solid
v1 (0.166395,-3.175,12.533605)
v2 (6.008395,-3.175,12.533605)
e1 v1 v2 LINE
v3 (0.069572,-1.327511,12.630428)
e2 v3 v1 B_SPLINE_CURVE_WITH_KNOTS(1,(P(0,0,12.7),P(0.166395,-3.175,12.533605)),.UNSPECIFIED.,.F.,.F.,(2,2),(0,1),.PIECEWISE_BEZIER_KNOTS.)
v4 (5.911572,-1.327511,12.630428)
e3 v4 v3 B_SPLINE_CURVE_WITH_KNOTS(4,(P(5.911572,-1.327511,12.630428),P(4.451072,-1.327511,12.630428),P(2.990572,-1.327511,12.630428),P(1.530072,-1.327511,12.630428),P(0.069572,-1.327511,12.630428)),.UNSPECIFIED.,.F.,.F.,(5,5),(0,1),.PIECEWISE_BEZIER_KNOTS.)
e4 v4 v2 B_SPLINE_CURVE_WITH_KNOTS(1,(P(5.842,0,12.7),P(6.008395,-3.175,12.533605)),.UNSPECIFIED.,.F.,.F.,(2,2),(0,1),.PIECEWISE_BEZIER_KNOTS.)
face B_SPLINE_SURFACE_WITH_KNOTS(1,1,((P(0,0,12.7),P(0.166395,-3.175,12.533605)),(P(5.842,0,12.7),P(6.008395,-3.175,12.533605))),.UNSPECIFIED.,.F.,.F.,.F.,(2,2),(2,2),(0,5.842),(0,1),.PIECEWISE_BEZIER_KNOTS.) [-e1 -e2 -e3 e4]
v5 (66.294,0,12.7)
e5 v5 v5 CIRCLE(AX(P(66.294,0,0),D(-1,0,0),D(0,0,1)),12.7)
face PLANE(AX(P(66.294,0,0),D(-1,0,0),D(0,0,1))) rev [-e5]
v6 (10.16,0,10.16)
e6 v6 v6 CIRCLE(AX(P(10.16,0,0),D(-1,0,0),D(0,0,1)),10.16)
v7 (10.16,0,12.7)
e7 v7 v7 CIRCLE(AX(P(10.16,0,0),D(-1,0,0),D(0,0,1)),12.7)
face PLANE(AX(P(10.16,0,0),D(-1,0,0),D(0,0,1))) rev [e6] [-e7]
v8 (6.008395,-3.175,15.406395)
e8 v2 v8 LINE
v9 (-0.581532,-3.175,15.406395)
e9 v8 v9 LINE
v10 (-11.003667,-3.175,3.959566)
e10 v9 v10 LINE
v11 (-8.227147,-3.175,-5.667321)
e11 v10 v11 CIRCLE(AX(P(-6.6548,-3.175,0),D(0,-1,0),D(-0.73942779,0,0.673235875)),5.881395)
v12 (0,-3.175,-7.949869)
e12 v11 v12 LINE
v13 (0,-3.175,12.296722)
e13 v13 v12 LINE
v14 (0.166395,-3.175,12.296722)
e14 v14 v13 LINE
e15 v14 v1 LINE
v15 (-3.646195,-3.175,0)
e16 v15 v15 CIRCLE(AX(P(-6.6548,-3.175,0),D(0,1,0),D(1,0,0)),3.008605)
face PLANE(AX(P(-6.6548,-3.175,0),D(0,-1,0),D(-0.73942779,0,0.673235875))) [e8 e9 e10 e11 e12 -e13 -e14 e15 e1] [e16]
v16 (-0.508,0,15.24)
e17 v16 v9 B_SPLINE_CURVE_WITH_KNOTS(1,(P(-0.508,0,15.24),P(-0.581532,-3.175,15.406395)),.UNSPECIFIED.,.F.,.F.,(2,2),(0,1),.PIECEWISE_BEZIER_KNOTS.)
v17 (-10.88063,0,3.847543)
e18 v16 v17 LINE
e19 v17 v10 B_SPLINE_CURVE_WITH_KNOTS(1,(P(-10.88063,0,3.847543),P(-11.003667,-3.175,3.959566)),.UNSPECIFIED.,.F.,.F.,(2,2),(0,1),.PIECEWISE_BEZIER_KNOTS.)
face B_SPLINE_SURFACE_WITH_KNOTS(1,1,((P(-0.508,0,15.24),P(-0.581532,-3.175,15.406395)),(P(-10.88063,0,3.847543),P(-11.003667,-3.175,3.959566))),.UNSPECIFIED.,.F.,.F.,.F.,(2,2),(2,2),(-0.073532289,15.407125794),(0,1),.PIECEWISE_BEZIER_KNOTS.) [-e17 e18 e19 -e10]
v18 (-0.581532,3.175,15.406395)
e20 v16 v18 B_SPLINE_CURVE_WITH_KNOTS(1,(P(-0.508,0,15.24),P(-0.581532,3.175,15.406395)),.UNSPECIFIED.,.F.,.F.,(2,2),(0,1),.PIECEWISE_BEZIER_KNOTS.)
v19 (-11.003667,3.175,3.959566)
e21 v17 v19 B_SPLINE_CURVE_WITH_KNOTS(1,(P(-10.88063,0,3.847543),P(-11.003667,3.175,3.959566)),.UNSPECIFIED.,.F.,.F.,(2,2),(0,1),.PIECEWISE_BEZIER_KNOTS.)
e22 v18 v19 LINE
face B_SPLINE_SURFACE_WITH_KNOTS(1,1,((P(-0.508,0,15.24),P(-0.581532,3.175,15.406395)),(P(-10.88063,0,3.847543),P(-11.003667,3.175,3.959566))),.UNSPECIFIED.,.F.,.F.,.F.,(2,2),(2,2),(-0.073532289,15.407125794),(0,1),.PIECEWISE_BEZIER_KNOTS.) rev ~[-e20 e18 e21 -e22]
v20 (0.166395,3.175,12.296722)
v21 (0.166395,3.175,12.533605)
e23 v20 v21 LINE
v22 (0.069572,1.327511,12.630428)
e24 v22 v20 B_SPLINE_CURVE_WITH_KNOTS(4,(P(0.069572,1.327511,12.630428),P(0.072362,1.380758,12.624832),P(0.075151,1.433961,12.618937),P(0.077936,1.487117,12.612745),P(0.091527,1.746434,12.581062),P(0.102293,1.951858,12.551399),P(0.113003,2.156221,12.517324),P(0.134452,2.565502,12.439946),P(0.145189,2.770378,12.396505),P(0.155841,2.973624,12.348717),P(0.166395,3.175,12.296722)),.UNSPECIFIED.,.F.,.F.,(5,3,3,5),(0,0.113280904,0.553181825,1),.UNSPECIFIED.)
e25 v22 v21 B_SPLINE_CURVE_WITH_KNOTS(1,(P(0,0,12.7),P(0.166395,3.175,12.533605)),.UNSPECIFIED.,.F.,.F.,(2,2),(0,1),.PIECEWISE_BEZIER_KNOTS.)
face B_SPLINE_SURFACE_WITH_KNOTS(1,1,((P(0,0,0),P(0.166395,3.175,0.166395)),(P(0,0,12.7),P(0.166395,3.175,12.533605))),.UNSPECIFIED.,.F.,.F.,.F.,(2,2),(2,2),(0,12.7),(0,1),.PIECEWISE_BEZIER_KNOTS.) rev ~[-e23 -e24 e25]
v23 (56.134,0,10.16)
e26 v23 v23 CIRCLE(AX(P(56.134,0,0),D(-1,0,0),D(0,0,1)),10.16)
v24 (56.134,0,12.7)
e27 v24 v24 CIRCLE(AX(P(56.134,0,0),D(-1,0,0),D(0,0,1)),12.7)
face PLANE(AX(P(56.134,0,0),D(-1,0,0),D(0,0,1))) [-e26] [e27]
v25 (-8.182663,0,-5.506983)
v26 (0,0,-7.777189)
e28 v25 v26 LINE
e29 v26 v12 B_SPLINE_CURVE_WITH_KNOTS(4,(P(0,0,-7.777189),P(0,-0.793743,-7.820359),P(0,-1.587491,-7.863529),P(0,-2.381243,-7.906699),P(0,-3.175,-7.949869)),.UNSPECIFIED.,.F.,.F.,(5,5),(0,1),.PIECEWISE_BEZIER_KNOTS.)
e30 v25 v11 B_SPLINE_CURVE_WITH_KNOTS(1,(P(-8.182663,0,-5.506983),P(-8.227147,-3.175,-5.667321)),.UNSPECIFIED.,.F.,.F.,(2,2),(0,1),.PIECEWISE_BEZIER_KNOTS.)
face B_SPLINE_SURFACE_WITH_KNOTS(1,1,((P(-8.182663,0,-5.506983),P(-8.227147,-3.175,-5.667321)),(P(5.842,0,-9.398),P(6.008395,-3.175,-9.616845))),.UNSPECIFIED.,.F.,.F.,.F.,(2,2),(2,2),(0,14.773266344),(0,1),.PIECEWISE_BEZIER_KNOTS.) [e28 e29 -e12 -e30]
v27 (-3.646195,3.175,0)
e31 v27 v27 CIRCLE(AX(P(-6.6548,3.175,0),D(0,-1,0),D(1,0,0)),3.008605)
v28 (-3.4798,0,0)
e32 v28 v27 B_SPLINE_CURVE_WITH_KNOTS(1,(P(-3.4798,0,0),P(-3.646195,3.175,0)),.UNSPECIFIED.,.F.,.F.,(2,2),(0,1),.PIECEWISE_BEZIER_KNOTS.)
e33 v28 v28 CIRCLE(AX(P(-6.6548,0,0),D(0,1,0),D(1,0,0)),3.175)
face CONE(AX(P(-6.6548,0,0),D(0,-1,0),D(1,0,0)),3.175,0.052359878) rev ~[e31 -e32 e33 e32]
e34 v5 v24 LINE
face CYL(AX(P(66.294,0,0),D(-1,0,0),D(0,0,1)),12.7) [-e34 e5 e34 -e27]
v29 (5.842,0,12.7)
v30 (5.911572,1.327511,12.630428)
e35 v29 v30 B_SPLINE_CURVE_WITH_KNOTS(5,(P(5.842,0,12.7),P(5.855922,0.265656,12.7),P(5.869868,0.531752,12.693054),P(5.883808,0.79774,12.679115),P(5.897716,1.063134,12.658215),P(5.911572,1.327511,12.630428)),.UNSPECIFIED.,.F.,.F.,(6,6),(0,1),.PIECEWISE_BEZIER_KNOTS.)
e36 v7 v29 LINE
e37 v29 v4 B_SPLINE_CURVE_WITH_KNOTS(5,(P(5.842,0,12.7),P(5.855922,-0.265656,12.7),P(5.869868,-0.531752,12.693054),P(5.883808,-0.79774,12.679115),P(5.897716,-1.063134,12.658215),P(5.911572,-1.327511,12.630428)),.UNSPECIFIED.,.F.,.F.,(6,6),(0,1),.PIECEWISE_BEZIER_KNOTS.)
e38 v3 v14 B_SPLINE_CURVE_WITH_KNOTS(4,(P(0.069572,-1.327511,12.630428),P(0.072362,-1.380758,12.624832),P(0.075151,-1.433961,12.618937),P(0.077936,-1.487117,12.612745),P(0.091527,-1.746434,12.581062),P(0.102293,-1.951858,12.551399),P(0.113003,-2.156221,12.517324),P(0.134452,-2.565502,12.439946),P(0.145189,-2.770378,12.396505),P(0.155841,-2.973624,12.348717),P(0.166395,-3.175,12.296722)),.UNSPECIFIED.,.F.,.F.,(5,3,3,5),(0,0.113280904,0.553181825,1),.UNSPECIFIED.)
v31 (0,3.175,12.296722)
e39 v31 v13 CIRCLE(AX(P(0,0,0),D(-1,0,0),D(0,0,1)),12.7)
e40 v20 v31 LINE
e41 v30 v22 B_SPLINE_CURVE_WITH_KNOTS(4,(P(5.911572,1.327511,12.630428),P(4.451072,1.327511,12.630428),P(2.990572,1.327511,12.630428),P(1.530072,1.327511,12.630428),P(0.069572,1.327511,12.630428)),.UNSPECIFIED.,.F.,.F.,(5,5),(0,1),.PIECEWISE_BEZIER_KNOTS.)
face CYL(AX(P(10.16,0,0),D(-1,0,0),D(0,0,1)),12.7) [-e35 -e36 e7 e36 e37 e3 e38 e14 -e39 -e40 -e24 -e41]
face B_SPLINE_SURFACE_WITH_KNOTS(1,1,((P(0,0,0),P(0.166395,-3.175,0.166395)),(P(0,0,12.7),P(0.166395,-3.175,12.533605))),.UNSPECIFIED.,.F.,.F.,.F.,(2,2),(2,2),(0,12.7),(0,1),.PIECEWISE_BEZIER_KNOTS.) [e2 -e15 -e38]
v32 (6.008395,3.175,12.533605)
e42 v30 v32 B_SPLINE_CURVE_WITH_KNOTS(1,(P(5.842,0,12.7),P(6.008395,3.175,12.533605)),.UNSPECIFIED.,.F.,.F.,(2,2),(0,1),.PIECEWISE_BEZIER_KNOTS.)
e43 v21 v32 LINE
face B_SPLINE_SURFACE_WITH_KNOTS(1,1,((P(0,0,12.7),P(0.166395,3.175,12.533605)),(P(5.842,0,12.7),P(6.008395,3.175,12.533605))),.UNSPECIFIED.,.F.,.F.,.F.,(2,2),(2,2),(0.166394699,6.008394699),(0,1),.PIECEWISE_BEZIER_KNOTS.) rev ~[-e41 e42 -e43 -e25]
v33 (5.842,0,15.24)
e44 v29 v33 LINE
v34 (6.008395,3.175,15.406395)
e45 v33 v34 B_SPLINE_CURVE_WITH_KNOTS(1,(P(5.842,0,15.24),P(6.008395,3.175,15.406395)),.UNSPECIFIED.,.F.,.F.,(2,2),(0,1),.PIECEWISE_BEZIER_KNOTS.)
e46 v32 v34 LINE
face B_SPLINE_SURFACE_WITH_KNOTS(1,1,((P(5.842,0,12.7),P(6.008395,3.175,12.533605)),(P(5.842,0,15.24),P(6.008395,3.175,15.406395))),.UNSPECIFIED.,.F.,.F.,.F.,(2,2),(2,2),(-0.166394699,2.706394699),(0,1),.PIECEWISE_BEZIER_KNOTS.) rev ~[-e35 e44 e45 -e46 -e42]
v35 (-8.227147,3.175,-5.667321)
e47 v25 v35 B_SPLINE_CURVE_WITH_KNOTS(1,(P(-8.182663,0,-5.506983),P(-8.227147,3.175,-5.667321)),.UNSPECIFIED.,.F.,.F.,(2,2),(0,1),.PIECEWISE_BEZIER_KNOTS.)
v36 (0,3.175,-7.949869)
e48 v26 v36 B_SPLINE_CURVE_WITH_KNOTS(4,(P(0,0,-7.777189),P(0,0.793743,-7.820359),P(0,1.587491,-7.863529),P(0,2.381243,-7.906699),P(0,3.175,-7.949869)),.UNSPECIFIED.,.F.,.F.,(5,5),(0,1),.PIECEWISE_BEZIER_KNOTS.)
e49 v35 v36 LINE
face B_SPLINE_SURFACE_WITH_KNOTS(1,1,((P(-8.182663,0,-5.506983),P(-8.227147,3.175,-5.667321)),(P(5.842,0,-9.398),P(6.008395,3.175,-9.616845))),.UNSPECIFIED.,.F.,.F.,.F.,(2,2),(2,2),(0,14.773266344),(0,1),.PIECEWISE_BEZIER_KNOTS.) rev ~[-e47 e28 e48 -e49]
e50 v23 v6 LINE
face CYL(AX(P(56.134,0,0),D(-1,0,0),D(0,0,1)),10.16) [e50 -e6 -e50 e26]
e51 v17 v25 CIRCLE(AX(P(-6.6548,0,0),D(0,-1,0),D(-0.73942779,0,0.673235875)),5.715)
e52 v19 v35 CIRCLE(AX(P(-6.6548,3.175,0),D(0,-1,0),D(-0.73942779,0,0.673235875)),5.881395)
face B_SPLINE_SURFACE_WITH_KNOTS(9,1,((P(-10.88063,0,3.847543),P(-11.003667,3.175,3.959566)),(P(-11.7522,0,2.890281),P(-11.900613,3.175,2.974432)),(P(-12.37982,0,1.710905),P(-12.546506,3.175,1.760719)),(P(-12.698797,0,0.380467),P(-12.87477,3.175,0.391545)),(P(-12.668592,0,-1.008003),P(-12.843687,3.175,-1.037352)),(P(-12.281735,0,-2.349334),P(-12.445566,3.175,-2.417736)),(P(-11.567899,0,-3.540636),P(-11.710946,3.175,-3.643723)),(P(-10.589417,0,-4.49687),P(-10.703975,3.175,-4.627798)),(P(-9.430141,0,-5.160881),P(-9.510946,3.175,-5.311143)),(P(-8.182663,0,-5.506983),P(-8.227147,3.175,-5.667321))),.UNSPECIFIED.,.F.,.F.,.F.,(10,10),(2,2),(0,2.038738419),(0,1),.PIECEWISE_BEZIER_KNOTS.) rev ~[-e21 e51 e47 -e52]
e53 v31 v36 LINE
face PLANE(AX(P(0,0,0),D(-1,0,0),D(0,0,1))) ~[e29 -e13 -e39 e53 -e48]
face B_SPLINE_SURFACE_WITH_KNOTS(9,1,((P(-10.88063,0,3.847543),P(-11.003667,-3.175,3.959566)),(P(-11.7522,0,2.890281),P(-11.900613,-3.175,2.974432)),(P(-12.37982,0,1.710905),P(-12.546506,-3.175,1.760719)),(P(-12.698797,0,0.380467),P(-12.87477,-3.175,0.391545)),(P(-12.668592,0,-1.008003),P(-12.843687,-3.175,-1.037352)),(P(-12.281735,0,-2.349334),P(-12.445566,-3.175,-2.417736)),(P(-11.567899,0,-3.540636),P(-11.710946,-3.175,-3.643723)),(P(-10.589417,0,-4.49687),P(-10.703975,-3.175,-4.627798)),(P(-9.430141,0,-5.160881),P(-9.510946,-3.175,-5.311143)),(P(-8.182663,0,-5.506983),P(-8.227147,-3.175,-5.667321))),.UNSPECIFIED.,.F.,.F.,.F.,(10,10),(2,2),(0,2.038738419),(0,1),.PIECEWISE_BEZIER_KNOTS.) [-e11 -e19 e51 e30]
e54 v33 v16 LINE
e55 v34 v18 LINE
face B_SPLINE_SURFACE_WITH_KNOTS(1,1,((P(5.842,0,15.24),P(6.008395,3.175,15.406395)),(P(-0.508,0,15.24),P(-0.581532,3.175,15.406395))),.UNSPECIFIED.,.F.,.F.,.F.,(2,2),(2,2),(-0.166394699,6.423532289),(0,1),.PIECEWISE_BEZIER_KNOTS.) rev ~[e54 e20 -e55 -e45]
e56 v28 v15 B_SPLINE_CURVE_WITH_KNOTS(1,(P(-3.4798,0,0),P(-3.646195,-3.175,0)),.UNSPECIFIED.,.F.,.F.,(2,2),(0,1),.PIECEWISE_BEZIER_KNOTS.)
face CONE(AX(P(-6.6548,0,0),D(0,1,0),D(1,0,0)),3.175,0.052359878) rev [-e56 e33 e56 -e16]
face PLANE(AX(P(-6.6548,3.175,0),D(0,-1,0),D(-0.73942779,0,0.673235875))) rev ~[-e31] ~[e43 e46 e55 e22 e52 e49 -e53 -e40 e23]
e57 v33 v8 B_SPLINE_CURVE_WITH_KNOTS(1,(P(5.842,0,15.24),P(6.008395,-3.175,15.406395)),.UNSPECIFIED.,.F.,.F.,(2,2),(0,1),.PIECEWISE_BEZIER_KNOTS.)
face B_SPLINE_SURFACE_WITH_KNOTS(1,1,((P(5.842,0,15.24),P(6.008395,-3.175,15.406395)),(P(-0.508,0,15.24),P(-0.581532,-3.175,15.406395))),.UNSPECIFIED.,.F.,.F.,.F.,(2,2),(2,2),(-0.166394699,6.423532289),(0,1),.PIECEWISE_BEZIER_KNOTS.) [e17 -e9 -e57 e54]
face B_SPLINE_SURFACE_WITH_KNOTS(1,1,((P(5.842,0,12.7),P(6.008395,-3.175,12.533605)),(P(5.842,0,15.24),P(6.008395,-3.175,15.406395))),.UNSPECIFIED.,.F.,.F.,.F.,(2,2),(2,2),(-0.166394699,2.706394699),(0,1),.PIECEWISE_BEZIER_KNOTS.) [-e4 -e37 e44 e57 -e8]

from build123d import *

# Parameters (mm, degrees)
F0_W     = 5.842
F0_H     = 12.7
F0_R     = 3.175
F2_DEPTH = 3.175
F2_TAPER = -3


# Not quite as in the source:
# - a feature names something its author has since deleted; it is built from what else it names


with BuildPart() as f1:
    # F0 (on Front) → F1 (revolve)
    with BuildSketch(Plane.XZ):
        with Locations((2.921, 6.35)):
            Rectangle(F0_W, F0_H)
        Polygon((5.842, 12.7), (5.842, 0), (66.294, 0), (66.294, 12.7), (56.134, 12.7), (56.134, 10.16), (10.16, 10.16), (10.16, 12.7), align=None)
    revolve(axis=Axis((33.147, 0, 0), (-1, 0, 0)))

    # F0 (on Front) → F2 (join, symmetric)
    with BuildSketch(Plane.XZ):
        with BuildLine():
            Line((-0.9398, 0), (0, 0))
            Line((0, 0), (0, 12.7))
            Line((0, 12.7), (5.842, 12.7))
            Line((5.842, 12.7), (5.842, 15.24))
            Line((5.842, 15.24), (-0.508, 15.24))
            Line((-0.508, 15.24), (-10.8806298187, 3.8475430269))
            ThreePointArc((-10.8806298187, 3.8475430269), (-4.5919612295, 5.3297205562), (-0.9398, 0))
        make_face()
        with BuildLine():
            ThreePointArc((-8.1826630726, -5.5069827884), (-3.1957909266, -4.5493385486), (-0.9398, 0))
            ThreePointArc((-0.9398, 0), (-4.5919612295, 5.3297205562), (-10.8806298187, 3.8475430269))
            ThreePointArc((-10.8806298187, 3.8475430269), (-12.1459778134, -1.5837270034), (-8.1826630726, -5.5069827884))
        make_face()
        with Locations((-6.6548, 0)):
            Circle(F0_R, mode=Mode.SUBTRACT)
        with BuildLine():
            Line((5.842, 0), (0, 0))
            Line((0, 0), (-0.9398, 0))
            ThreePointArc((-0.9398, 0), (-3.1957909266, -4.5493385486), (-8.1826630726, -5.5069827884))
            Line((-8.1826630726, -5.5069827884), (5.842, -9.398))
            Line((5.842, -9.398), (5.842, 0))
        make_face()
    extrude(amount=F2_DEPTH, both=True, taper=F2_TAPER)


solid = f1.part
